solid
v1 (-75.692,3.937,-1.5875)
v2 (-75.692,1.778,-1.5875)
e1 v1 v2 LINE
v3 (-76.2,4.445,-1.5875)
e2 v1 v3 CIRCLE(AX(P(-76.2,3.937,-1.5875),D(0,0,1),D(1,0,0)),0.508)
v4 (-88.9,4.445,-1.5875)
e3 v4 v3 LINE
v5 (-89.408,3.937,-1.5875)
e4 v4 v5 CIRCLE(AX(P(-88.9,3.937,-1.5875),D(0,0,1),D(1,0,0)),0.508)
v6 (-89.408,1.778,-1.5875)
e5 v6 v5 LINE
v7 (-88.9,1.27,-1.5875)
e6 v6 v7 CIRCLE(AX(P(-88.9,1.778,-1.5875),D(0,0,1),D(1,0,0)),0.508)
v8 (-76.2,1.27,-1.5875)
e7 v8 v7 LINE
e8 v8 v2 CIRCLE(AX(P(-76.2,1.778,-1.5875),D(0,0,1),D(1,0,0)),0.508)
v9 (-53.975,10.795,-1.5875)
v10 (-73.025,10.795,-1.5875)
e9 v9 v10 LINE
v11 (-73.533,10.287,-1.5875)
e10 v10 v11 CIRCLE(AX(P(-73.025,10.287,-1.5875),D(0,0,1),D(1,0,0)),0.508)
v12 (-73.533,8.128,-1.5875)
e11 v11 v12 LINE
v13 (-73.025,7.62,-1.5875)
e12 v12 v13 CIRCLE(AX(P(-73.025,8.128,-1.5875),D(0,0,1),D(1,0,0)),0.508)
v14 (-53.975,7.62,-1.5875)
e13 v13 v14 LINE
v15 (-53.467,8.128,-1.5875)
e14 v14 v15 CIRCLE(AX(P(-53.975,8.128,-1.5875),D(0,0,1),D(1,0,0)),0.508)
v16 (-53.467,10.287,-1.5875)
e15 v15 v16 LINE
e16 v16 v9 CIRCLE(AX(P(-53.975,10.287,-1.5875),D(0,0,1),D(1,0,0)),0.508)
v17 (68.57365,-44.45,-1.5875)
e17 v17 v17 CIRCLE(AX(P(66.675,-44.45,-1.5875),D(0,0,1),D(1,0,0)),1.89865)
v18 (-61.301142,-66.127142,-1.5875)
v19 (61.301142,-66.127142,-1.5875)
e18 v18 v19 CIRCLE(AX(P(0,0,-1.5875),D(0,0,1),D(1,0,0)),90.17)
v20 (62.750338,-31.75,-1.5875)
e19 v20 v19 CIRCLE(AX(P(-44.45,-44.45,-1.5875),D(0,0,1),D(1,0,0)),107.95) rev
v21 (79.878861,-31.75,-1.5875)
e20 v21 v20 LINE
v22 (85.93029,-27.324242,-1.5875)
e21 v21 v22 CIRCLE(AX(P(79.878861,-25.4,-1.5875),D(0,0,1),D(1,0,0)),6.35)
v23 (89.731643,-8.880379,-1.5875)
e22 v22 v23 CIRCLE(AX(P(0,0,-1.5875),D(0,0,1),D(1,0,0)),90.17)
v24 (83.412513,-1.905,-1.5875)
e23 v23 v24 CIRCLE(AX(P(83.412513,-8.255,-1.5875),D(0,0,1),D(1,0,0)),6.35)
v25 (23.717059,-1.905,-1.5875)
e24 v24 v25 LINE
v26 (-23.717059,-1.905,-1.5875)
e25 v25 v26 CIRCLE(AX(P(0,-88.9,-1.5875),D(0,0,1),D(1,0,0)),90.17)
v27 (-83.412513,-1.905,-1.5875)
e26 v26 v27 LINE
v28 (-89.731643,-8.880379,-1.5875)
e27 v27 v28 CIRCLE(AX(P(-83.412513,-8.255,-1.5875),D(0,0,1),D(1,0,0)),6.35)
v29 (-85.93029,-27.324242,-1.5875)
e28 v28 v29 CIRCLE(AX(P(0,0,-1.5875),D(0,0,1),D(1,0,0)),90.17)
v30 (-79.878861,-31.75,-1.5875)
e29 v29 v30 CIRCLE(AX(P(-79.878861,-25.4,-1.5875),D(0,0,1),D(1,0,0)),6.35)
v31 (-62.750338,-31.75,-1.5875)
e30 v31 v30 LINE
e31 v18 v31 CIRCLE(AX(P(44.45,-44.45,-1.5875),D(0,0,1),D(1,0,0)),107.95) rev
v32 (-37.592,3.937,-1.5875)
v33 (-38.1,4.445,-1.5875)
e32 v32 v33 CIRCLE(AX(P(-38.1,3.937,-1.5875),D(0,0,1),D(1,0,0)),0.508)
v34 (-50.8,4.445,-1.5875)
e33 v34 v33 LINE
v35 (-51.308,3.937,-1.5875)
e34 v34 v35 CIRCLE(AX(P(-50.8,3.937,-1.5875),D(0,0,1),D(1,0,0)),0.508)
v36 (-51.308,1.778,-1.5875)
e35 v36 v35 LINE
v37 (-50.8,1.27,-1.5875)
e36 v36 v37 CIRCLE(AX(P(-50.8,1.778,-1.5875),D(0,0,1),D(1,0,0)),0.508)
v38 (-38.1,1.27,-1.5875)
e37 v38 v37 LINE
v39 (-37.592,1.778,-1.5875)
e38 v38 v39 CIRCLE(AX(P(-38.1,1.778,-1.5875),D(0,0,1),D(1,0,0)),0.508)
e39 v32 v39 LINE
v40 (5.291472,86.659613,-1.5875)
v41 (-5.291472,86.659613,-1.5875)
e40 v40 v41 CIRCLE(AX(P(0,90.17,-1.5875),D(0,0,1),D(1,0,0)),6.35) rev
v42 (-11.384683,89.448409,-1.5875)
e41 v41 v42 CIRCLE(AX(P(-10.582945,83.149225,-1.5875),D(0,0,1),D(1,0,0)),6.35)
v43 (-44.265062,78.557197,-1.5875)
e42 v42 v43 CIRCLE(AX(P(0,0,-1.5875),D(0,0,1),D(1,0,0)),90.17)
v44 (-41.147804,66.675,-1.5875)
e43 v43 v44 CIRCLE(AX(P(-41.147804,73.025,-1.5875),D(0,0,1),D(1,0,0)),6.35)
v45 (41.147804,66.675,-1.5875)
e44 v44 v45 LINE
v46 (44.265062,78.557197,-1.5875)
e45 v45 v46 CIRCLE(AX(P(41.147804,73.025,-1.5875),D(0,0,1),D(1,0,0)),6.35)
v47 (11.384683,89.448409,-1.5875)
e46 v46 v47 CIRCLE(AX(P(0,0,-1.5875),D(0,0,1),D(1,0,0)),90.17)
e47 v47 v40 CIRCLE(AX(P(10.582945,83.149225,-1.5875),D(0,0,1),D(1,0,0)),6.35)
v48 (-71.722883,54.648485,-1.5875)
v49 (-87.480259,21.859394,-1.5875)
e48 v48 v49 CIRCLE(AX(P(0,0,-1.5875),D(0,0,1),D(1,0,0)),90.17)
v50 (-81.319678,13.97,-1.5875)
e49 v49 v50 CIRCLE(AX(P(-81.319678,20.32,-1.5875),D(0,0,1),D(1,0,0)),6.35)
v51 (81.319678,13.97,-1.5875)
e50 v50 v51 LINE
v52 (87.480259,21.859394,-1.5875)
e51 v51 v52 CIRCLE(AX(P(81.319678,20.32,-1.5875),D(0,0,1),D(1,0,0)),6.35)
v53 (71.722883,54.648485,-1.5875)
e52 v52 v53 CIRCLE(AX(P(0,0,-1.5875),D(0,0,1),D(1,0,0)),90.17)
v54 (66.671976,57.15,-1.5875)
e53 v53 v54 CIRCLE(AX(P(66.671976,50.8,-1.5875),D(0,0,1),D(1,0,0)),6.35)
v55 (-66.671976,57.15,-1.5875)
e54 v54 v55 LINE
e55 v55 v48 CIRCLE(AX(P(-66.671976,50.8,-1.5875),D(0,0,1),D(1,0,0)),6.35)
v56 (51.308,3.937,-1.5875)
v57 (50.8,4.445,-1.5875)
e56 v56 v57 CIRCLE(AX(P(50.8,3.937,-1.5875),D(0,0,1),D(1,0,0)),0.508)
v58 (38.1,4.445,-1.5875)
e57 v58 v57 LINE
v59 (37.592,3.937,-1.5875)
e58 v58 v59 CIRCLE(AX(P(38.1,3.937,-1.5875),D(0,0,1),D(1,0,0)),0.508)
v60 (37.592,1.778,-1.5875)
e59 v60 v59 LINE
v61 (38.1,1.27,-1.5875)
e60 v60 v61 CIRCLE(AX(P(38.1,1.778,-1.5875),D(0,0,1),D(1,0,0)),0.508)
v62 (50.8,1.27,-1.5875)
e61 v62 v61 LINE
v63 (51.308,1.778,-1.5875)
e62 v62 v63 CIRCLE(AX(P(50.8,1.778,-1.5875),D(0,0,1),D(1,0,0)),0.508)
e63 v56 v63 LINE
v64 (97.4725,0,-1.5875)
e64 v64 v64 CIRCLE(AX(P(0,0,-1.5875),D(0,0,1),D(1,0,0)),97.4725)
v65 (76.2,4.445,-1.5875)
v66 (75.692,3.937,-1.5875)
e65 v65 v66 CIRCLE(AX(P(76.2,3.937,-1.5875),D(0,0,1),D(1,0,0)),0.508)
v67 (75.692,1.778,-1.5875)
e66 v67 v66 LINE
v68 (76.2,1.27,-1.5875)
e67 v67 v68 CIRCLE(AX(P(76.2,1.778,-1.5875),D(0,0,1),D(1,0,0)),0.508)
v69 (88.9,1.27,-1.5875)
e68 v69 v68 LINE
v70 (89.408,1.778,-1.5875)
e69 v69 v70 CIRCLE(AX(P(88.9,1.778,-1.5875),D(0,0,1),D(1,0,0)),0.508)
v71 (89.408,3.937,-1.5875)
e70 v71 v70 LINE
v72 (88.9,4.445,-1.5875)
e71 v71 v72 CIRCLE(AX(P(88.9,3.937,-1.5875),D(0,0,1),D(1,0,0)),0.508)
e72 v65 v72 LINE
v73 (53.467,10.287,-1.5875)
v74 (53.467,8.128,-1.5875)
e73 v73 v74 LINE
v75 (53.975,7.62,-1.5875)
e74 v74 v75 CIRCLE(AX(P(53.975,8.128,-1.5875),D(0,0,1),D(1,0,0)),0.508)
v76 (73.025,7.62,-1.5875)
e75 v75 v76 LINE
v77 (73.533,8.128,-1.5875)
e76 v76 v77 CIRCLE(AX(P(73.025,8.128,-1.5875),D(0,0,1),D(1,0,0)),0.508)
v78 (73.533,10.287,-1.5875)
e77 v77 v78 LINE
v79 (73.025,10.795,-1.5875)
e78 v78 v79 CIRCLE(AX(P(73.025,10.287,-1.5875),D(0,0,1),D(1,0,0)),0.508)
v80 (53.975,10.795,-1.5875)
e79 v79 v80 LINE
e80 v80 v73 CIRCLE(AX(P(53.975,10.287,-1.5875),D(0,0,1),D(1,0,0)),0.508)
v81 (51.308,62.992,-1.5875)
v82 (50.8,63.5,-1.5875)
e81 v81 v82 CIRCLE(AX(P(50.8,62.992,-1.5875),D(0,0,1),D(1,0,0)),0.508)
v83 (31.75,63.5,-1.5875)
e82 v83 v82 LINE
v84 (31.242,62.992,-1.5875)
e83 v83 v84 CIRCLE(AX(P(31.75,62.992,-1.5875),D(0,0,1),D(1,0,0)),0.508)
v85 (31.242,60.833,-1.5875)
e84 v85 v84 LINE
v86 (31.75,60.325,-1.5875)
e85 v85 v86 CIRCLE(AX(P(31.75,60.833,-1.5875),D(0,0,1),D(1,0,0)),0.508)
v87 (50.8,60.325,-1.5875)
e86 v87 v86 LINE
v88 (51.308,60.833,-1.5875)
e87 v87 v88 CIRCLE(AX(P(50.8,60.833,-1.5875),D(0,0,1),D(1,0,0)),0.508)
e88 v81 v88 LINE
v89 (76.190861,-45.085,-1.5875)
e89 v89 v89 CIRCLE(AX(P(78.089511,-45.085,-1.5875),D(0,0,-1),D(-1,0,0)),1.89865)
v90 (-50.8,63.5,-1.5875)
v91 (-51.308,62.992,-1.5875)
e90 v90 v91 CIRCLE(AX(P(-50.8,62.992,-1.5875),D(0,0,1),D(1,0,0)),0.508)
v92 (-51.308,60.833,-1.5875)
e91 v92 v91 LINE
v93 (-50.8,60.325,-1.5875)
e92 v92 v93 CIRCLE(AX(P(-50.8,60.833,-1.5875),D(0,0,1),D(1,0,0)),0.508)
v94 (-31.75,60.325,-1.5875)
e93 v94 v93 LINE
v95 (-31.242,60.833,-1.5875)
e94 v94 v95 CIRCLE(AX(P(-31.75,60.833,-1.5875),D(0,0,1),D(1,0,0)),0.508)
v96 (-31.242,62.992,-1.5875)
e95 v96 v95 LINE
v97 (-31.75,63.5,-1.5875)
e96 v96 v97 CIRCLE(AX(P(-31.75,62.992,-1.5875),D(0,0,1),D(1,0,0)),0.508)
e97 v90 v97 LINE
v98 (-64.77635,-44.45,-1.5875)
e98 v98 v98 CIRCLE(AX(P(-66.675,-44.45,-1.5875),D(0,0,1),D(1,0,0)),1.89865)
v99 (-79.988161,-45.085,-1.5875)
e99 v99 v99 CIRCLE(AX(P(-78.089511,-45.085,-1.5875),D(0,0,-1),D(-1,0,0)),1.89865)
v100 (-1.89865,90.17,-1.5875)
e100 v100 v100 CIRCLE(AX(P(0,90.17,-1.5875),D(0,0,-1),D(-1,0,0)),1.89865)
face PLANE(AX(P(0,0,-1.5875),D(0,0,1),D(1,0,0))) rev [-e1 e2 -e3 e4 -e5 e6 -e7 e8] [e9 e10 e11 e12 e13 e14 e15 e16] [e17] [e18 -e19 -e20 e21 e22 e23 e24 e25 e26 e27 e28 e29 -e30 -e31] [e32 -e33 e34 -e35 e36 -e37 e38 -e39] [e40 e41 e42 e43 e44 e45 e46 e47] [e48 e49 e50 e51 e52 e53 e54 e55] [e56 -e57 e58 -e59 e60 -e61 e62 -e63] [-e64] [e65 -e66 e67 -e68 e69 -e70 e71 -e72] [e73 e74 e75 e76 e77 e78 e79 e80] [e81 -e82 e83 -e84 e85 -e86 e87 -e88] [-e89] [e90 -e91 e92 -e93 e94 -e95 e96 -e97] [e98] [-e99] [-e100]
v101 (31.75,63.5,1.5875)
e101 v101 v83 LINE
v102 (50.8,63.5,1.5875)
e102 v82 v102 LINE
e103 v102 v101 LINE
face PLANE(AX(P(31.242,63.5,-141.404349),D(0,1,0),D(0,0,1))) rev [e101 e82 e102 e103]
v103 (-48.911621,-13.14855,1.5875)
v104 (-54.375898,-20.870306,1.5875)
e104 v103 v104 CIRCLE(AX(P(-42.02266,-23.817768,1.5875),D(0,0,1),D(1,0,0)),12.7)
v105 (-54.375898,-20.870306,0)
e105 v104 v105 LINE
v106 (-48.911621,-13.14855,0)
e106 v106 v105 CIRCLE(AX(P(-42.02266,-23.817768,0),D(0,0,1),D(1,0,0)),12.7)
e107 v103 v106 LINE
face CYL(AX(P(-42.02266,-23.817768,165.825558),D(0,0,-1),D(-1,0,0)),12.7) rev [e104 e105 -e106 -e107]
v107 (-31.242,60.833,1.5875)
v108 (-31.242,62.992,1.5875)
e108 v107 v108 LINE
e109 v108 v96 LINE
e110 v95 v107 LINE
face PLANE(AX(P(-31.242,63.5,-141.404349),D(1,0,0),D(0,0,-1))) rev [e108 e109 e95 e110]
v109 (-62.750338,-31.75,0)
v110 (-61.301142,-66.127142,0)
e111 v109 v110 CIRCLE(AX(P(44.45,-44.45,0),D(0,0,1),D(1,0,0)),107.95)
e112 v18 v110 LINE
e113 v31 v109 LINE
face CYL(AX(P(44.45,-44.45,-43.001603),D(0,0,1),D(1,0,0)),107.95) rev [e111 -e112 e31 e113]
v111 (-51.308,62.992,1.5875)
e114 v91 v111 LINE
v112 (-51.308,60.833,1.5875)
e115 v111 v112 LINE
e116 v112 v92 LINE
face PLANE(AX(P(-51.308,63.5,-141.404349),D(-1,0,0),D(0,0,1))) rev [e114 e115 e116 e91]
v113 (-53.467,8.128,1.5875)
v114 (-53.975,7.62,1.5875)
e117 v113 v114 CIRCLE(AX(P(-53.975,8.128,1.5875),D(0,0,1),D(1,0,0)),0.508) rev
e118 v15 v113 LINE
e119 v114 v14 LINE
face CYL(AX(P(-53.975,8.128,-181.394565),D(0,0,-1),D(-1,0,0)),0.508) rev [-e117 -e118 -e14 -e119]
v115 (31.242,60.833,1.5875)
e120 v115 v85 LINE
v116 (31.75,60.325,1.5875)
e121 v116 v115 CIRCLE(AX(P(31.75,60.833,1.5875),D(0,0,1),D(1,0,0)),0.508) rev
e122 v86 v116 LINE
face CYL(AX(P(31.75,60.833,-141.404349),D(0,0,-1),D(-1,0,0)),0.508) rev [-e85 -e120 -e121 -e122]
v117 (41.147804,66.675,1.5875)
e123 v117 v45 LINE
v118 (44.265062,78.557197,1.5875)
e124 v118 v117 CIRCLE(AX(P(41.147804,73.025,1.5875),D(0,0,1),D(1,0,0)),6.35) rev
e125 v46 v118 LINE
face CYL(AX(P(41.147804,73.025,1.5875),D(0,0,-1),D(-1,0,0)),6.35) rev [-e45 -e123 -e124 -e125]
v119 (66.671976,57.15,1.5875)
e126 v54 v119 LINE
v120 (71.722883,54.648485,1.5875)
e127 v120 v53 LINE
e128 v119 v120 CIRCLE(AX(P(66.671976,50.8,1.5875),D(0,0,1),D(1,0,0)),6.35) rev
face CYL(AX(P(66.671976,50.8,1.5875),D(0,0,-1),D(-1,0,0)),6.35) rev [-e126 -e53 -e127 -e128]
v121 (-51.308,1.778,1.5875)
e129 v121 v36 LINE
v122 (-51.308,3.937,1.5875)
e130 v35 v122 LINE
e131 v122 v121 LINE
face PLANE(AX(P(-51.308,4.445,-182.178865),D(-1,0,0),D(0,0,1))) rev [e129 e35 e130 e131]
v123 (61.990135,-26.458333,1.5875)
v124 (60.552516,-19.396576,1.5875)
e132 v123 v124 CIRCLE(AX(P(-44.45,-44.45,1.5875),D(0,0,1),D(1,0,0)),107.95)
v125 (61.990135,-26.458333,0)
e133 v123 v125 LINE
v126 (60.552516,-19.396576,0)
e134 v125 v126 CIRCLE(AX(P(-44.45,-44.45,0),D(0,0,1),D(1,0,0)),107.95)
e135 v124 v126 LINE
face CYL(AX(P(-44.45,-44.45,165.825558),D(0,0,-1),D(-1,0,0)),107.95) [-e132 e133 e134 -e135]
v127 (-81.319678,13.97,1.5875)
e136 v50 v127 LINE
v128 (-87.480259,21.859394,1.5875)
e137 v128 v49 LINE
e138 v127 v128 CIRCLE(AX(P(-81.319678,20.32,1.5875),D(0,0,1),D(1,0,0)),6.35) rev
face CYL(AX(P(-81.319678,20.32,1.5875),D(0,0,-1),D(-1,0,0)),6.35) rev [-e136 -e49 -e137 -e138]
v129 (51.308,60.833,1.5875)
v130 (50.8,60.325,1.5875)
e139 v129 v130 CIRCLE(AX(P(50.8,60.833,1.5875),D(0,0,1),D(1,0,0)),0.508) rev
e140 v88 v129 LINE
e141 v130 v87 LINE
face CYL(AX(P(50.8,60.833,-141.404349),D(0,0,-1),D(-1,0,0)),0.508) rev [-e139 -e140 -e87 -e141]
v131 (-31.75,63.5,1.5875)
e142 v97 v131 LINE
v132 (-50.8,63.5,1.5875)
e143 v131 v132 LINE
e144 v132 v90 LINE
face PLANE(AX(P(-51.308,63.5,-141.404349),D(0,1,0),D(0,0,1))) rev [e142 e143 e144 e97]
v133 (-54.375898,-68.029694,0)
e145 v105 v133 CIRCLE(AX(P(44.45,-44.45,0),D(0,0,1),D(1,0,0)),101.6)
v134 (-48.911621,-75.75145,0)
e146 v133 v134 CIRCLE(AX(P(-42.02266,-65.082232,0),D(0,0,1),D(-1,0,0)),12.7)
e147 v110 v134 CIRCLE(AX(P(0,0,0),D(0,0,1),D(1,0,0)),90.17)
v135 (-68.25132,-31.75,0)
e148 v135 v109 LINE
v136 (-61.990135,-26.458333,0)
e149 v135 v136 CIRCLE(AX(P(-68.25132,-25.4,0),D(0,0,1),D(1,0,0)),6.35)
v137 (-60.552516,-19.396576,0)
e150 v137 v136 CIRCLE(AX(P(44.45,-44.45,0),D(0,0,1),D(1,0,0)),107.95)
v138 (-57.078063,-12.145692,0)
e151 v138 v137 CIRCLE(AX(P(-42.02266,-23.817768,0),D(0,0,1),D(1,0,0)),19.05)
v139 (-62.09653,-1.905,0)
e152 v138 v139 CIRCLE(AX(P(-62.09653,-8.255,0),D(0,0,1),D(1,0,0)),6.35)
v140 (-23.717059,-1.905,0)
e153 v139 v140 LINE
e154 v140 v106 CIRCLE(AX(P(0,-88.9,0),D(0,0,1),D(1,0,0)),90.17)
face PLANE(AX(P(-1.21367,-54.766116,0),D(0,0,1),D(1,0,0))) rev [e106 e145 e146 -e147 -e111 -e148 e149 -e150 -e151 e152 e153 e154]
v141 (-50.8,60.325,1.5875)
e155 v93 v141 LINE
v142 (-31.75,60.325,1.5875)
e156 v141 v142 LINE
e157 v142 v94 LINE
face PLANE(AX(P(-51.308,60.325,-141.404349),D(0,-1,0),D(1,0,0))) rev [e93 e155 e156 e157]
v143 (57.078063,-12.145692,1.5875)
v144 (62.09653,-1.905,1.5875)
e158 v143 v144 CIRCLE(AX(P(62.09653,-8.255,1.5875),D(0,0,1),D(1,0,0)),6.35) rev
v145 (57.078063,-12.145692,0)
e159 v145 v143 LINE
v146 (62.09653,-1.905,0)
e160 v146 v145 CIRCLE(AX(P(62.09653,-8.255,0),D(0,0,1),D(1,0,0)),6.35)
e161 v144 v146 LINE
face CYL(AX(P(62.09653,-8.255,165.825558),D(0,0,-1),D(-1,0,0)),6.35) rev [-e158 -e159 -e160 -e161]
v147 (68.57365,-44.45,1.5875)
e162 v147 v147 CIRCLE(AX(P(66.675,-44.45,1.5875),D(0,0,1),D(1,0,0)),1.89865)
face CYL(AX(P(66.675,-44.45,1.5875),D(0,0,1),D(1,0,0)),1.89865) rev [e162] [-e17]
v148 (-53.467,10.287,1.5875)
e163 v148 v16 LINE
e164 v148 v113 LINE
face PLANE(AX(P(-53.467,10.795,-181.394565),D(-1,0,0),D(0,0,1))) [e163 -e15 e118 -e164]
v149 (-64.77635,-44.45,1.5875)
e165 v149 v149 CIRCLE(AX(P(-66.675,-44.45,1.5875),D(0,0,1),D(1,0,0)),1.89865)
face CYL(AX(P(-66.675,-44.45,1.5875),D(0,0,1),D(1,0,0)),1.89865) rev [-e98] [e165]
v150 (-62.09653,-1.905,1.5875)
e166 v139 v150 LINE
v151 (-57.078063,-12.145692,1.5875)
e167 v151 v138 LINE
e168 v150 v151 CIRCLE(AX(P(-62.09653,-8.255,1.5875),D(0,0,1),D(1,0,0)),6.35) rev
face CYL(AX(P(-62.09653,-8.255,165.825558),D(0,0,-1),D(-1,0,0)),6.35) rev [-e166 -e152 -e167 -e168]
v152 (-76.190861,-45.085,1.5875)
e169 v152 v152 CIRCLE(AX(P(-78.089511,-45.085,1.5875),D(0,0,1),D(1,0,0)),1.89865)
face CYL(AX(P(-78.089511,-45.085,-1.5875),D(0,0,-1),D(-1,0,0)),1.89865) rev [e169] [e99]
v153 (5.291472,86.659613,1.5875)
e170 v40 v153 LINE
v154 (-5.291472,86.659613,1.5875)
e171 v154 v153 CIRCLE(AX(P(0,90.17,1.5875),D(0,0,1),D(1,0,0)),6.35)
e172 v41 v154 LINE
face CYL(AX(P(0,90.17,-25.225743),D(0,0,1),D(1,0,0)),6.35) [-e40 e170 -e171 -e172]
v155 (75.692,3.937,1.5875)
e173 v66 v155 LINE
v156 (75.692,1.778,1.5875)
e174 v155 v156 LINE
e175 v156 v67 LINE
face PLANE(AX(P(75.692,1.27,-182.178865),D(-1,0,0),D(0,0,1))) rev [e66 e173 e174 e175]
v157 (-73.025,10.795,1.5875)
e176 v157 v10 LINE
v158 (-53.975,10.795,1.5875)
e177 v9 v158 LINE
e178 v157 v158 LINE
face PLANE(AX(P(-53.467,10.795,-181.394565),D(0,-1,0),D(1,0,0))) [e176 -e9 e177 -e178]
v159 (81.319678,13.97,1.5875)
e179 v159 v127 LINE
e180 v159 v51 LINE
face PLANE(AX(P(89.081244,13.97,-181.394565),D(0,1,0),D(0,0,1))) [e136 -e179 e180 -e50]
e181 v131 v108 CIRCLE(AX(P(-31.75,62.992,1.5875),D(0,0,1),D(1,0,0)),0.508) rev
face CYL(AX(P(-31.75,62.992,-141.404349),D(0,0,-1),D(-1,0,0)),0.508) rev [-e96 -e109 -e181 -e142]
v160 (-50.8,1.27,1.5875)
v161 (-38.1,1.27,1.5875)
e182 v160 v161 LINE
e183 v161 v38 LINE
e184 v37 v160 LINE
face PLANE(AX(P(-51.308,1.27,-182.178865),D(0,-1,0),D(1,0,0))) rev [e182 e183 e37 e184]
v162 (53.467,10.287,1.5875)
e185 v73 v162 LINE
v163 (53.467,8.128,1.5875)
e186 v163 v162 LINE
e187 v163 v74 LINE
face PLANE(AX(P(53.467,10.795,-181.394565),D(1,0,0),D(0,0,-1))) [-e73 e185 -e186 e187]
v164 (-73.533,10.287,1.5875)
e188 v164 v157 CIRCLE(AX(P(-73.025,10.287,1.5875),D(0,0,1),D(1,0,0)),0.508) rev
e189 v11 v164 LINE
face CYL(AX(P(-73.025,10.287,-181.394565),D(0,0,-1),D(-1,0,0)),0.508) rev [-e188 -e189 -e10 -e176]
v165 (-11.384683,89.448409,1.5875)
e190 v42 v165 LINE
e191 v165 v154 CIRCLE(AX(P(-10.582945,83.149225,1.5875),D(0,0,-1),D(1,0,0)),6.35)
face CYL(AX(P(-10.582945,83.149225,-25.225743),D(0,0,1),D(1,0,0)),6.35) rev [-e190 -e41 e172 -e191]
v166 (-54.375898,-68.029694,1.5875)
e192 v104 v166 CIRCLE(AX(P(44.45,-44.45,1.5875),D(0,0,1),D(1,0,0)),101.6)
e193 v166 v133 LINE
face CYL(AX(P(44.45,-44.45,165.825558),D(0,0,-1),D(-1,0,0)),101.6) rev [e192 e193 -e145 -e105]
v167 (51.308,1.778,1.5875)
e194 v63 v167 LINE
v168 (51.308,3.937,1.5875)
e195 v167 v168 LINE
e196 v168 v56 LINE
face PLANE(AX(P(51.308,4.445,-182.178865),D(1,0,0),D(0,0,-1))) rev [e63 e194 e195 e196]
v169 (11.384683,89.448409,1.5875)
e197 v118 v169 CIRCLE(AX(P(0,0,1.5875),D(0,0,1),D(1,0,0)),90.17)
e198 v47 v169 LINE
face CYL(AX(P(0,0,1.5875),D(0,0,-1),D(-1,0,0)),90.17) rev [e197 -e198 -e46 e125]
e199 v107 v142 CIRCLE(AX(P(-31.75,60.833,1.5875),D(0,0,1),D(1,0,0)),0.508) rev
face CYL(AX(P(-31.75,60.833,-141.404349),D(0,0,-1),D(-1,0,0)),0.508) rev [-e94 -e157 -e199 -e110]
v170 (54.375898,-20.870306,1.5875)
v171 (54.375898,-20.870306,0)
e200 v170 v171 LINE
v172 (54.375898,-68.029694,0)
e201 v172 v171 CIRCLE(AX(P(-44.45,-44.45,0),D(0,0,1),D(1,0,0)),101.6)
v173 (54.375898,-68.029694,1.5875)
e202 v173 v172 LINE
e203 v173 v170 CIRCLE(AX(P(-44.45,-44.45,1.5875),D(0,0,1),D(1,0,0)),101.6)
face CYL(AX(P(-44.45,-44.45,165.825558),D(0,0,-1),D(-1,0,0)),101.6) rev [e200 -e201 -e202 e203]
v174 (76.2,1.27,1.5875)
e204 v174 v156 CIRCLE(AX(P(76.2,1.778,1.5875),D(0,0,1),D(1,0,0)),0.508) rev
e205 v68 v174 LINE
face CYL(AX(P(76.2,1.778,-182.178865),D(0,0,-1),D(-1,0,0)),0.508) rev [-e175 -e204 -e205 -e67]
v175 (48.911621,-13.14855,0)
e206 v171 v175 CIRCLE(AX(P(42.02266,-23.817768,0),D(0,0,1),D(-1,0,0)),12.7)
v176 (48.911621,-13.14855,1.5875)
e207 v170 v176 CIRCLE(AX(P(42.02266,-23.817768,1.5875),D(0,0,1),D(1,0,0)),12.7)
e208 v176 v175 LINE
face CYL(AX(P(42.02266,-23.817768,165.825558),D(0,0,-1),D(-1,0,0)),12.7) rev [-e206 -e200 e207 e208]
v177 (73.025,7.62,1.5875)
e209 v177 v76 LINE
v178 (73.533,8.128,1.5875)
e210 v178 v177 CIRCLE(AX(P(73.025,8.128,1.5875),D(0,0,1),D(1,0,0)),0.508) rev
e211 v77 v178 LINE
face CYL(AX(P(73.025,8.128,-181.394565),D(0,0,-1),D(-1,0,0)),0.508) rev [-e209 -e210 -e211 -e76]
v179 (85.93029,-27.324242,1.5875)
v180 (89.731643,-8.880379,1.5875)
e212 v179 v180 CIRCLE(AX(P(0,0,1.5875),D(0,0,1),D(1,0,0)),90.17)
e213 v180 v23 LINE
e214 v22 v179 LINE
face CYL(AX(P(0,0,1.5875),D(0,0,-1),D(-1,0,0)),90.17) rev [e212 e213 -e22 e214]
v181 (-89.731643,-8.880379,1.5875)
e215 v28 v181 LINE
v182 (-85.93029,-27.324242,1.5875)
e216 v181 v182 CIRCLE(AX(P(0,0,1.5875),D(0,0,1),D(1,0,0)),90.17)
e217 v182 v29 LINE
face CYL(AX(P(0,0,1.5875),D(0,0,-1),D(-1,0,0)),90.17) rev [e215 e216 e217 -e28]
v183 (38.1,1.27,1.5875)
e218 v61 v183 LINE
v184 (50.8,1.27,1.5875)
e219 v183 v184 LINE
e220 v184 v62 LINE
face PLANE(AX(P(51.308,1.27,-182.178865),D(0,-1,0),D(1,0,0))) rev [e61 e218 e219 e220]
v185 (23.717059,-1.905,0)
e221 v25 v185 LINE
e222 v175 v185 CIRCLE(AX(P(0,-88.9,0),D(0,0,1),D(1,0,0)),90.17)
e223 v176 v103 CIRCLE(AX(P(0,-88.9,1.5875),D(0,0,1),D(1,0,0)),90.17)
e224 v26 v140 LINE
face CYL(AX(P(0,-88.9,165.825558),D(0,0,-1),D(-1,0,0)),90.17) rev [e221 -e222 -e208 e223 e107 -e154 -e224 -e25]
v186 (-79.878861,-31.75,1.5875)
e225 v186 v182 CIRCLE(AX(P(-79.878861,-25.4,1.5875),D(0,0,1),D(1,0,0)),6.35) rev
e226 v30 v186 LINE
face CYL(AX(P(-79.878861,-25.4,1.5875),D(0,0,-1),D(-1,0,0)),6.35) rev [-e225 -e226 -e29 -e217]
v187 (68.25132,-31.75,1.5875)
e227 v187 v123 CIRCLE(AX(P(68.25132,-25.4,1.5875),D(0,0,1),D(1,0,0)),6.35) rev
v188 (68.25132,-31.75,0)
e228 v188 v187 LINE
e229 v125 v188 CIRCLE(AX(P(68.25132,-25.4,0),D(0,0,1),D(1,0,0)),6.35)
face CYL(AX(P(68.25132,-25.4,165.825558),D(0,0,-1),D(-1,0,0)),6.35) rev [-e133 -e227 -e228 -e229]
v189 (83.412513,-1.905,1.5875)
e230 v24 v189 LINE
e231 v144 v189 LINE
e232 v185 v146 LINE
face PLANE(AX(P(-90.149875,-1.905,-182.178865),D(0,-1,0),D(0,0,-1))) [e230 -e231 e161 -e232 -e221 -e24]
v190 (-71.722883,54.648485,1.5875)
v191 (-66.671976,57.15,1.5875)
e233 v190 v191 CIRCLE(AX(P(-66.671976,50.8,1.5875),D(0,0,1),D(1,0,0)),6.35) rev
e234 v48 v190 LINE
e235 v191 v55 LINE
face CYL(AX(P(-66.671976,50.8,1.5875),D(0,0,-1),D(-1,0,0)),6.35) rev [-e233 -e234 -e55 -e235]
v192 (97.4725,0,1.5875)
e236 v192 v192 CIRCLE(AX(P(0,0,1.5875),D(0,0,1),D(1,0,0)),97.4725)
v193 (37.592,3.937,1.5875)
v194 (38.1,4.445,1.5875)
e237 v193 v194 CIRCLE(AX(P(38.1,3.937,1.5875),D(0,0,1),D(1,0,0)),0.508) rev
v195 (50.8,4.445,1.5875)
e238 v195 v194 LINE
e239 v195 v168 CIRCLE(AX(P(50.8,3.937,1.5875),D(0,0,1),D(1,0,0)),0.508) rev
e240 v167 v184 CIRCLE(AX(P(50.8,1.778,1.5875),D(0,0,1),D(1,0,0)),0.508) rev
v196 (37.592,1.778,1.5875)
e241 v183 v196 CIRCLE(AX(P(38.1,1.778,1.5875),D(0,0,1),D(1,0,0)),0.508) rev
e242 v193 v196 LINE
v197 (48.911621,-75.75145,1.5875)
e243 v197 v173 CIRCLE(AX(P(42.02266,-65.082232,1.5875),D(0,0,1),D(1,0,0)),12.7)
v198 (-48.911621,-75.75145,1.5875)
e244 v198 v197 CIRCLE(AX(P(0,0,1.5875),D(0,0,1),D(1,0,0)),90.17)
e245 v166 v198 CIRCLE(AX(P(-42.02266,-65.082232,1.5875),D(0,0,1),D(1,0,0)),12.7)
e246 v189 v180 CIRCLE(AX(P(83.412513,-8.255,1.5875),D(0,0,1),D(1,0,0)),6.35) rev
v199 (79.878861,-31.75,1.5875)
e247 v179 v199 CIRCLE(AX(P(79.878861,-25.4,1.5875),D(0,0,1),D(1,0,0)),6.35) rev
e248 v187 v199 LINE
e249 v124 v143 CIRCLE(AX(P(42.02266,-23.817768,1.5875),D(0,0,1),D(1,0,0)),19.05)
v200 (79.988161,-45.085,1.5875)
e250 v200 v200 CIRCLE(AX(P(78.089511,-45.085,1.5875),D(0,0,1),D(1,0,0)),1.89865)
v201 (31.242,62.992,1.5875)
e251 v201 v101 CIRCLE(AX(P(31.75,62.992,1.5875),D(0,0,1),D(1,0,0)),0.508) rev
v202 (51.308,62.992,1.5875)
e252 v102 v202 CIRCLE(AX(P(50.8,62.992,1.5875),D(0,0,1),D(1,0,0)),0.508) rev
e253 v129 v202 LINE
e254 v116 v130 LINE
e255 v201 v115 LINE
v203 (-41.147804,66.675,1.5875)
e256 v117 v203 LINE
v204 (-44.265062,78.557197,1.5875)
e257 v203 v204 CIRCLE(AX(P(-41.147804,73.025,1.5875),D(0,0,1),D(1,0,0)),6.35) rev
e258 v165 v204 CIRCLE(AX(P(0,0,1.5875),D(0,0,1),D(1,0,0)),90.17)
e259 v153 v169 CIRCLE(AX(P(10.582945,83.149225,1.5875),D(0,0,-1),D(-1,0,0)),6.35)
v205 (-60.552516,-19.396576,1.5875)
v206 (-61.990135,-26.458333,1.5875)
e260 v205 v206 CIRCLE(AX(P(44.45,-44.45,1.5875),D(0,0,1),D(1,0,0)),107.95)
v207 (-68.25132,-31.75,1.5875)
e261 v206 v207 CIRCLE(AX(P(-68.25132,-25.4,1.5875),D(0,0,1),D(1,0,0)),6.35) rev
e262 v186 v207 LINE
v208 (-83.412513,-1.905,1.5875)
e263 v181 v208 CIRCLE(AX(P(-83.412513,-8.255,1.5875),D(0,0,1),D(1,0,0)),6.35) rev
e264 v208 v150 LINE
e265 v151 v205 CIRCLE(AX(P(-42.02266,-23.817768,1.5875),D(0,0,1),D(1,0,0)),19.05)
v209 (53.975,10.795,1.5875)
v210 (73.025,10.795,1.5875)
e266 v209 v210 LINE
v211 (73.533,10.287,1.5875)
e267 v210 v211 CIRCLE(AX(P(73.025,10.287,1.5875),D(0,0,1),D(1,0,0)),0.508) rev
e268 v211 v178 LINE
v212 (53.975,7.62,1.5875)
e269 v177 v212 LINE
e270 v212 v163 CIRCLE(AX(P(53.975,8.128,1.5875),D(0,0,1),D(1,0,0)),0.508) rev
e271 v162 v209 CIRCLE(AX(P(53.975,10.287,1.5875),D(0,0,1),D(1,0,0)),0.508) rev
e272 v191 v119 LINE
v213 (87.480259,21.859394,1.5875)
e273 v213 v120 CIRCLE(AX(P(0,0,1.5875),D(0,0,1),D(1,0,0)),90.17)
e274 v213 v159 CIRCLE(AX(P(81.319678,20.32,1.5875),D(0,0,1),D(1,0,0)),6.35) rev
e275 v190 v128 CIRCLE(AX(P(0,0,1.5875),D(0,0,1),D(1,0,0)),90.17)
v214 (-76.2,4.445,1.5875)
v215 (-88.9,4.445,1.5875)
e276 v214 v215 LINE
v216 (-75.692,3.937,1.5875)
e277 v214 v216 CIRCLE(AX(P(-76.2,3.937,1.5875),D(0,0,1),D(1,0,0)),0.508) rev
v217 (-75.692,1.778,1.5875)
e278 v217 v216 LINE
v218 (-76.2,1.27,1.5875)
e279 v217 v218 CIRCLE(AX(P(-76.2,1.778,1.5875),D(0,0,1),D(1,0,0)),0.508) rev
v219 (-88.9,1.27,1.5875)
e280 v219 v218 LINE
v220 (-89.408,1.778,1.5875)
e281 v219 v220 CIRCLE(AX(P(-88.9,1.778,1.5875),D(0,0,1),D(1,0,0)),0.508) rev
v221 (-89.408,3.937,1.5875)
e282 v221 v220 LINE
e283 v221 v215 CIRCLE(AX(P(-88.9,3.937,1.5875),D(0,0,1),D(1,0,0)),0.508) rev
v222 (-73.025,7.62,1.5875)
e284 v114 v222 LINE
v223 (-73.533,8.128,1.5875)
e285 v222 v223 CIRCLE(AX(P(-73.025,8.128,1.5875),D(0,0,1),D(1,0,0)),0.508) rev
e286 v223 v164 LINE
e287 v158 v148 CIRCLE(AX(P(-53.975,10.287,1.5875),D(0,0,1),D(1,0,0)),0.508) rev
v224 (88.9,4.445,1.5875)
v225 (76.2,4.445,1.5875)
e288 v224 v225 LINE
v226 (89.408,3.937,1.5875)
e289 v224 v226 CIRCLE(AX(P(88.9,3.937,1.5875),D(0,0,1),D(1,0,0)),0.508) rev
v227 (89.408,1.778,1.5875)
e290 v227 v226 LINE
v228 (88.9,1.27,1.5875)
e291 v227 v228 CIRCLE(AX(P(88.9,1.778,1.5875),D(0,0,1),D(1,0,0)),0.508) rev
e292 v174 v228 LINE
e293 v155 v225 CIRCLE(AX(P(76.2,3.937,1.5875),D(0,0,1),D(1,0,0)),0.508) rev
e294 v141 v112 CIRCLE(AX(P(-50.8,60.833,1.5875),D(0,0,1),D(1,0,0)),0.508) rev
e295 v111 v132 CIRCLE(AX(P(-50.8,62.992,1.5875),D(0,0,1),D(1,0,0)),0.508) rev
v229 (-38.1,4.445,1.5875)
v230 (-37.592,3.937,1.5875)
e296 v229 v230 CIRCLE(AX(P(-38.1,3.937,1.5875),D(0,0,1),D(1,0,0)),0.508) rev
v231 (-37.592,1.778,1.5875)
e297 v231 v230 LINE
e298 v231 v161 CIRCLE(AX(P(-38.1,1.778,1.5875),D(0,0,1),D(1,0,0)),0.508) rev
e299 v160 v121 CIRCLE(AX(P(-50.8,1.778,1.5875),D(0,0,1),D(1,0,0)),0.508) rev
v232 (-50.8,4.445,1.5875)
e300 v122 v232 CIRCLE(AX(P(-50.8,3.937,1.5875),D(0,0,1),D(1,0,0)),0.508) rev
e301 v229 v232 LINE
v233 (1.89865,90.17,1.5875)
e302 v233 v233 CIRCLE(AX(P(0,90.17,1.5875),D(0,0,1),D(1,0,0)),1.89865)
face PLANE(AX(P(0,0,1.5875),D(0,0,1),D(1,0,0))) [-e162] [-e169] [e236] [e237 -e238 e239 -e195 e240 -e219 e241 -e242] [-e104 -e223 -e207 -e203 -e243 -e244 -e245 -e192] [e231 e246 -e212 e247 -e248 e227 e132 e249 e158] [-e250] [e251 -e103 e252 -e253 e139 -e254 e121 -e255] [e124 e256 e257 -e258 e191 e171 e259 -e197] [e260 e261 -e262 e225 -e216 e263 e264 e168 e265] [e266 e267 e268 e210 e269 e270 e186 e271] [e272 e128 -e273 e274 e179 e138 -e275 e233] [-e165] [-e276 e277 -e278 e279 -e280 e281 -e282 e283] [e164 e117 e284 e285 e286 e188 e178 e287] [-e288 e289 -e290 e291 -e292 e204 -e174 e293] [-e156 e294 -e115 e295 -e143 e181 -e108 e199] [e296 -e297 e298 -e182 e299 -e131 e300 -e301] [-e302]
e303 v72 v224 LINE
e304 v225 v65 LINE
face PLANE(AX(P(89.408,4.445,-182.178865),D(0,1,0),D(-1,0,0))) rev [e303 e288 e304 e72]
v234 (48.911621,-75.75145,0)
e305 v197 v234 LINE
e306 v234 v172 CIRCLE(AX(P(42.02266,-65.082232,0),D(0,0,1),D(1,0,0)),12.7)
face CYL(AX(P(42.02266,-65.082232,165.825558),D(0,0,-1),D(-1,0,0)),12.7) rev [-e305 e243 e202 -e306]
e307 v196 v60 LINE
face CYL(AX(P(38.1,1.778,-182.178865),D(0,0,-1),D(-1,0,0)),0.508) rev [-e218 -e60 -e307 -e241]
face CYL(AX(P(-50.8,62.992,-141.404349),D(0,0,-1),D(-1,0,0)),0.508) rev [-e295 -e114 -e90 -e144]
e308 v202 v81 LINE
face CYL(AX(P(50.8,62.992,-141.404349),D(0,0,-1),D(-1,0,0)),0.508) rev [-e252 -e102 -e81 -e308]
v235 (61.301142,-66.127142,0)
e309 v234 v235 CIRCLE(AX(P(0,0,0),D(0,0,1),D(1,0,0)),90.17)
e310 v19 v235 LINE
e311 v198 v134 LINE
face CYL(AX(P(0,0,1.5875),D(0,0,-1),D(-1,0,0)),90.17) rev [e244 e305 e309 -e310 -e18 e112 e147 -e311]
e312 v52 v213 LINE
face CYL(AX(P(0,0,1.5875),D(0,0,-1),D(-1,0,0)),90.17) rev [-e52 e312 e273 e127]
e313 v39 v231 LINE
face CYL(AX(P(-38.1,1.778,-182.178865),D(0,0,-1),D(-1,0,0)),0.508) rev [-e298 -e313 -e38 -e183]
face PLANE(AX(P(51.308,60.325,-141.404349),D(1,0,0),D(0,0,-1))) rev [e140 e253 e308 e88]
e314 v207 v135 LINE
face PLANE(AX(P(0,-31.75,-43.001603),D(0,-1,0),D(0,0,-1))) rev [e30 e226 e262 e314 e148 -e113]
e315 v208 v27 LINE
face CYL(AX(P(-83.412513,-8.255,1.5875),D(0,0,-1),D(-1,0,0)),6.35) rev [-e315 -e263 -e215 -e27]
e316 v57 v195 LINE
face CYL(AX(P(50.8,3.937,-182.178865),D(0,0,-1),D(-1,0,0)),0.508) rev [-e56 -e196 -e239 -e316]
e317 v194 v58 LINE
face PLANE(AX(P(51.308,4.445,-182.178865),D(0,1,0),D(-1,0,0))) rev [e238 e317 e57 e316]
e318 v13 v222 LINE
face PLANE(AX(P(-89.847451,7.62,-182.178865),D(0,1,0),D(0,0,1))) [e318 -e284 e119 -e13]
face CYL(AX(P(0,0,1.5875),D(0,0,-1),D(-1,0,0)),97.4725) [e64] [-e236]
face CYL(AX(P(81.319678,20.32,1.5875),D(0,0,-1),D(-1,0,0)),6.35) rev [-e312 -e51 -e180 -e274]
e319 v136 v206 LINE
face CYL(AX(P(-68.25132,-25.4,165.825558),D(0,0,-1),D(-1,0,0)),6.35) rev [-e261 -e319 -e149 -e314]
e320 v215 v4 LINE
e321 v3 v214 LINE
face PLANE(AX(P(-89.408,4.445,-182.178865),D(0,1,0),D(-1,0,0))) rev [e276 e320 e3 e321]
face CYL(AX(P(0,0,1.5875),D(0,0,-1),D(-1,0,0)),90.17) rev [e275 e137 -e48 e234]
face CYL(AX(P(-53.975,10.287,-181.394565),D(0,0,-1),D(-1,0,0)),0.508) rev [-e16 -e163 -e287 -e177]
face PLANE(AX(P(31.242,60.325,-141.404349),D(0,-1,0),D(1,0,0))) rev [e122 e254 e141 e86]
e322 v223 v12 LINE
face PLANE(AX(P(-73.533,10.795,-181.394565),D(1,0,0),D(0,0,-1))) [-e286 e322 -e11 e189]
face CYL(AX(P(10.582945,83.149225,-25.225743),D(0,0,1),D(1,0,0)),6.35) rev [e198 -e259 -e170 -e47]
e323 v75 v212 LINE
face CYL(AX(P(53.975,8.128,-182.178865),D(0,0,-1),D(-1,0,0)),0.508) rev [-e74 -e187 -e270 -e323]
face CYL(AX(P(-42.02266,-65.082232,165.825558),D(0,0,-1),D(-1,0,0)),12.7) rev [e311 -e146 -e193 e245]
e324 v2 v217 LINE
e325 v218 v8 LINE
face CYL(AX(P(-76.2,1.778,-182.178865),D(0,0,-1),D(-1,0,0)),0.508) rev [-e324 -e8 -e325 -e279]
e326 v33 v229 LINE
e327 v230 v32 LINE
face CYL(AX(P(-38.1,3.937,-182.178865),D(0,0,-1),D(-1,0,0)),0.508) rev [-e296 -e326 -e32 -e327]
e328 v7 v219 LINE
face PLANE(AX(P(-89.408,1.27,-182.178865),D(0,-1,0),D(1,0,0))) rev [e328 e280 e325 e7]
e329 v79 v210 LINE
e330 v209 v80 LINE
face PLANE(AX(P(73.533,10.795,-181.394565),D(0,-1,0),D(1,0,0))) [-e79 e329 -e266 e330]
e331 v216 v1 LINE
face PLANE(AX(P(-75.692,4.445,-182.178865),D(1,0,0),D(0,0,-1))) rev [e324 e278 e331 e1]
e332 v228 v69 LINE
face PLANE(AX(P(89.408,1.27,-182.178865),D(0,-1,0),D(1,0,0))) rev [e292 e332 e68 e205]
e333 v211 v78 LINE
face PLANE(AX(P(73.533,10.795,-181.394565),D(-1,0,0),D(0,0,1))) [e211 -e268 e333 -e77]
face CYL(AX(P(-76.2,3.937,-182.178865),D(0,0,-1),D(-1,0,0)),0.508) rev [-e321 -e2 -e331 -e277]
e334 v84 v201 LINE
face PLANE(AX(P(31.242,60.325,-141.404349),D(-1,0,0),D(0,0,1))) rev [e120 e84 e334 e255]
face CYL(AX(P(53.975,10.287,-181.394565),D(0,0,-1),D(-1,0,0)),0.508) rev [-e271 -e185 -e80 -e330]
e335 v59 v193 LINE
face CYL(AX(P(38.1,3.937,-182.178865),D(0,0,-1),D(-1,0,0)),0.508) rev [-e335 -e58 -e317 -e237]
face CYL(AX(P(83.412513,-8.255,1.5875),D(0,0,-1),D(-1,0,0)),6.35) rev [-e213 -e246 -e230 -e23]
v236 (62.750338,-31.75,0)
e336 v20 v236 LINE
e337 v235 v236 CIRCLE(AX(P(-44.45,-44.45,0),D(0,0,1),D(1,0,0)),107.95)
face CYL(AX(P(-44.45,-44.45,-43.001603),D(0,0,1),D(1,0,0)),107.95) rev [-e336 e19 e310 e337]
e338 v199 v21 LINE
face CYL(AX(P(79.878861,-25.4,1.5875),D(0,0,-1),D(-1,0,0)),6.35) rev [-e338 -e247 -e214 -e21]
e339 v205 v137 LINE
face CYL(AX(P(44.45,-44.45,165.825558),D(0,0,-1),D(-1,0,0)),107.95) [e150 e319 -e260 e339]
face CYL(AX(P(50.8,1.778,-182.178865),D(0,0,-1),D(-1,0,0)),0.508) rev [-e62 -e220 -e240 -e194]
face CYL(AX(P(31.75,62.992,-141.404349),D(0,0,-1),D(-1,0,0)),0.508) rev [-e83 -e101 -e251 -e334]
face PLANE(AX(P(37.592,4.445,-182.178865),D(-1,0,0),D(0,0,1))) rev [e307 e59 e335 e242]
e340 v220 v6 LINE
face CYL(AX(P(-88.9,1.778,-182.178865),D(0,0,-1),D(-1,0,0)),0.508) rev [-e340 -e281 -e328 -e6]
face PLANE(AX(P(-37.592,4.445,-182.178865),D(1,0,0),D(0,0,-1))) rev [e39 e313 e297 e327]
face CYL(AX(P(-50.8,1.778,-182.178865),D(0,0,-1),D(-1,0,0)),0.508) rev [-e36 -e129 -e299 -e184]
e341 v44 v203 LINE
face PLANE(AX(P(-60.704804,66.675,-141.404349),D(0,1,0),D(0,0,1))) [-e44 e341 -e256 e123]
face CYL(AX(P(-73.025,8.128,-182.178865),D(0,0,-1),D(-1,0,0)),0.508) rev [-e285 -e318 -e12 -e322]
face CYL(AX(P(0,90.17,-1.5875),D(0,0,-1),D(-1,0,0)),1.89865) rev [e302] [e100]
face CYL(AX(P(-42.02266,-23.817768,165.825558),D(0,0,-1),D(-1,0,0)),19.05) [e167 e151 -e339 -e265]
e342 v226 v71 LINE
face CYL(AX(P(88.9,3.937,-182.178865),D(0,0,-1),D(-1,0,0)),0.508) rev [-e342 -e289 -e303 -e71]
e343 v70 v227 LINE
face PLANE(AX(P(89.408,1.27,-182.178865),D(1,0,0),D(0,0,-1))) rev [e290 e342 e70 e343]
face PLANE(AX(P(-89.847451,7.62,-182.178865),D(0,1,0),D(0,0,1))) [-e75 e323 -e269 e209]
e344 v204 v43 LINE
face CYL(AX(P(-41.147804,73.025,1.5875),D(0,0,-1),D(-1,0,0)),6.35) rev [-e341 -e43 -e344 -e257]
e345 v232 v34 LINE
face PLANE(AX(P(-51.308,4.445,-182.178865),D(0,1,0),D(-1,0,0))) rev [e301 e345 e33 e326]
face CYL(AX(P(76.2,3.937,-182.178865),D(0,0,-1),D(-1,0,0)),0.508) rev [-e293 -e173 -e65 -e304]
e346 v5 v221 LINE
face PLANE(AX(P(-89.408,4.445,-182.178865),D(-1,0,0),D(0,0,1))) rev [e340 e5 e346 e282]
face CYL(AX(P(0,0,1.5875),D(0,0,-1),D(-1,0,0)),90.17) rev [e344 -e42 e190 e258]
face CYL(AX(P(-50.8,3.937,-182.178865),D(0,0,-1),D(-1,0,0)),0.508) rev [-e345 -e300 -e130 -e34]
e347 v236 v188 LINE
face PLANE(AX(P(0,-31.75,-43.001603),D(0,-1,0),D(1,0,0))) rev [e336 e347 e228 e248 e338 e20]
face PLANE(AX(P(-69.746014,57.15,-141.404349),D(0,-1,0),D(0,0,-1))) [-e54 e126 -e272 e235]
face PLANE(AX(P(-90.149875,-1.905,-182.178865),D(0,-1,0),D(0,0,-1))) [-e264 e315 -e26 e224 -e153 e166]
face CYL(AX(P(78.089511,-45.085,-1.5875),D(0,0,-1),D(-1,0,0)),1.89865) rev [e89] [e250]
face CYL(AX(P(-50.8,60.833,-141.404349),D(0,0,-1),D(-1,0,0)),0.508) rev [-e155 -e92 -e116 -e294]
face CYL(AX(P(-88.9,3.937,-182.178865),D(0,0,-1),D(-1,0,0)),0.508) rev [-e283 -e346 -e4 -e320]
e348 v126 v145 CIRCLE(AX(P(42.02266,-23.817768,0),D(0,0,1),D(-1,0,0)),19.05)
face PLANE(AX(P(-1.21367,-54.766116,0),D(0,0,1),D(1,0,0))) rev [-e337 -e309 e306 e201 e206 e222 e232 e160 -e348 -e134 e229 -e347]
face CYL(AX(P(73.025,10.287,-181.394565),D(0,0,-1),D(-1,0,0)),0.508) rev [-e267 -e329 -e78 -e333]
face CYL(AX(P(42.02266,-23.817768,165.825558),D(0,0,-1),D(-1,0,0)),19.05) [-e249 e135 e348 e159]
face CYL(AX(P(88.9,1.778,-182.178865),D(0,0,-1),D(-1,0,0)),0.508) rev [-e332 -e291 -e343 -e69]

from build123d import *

# Parameters (mm, degrees)
SKETCH1_R             = 97.4725
SKETCH1_R_2           = 90.17
BOSS_EXTRUDE1_DEPTH   = 1.5875
BOSS_EXTRUDE2_START   = -3.175
BOSS_EXTRUDE2_DEPTH   = 3.175
CIRPATTERN2_COUNT     = 3
BOSS_EXTRUDE3_DEPTH   = 1.5875
BOSS_EXTRUDE4_START   = -3.175
BOSS_EXTRUDE4_DEPTH   = 3.175
FILLET2_R             = 6.35
F_6_CLEARANCE_HOLE1_D = 3.7973
BOSS_EXTRUDE5_START   = -3.175
SKETCH13_W            = 13.716
SKETCH13_H            = 3.175
BOSS_EXTRUDE5_DEPTH   = 3.175
SKETCH14_W            = 13.716
SKETCH14_H            = 3.175
CUT_EXTRUDE1_DEPTH    = 138.883491171
BOSS_EXTRUDE6_START   = -3.175
BOSS_EXTRUDE6_DEPTH   = 3.175
BOSS_EXTRUDE7_START   = -3.175
SKETCH16_W            = 20.066
SKETCH16_H            = 3.175
BOSS_EXTRUDE7_DEPTH   = 3.175
FILLET3_R             = 6.35
FILLET4_R             = 0.508


with BuildPart() as part:
    # Sketch1 → Boss-Extrude1 (new, symmetric)
    with BuildSketch(Plane.XY):
        Circle(SKETCH1_R)
        Circle(SKETCH1_R_2, mode=Mode.SUBTRACT)
    extrude(amount=BOSS_EXTRUDE1_DEPTH, both=True)

    # Sketch2 → Boss-Extrude2 (add)
    with BuildSketch(Plane.XY.offset(1.5875).offset(BOSS_EXTRUDE2_START)):
        with BuildLine():
            ThreePointArc((-5.291472464, 86.659612676), (0, 83.82), (5.291472464, 86.659612676))
            ThreePointArc((5.291472464, 86.659612676), (7.940261692, 88.923194985), (11.38468318, 89.448409091))
            ThreePointArc((11.38468318, 89.448409091), (0, 90.17), (-11.38468318, 89.448409091))
            ThreePointArc((-11.38468318, 89.448409091), (-7.940261692, 88.923194985), (-5.291472464, 86.659612676))
        make_face()
    boss_extrude2 = extrude(amount=BOSS_EXTRUDE2_DEPTH)

    # Sketch7 → #6 Clearance Hole2 (revolve, cut)
    with BuildSketch(Plane(origin=(0, 90.17, -1.5875), x_dir=(0, 1, 0), z_dir=(1, 0, 0))):
        Polygon((0, 0), (0, 7.490824014), (1.89865, 6.35), (1.89865, 0), align=None)
    f_6_clearance_hole2 = revolve(axis=Axis((0, 90.17, -7.9375), (0, 0, 1)), mode=Mode.SUBTRACT)

    # CirPattern2: Boss-Extrude2, #6 Clearance Hole2 ×3 about axis
    cirpattern2_axis = Axis((0, 0, 0), (0, 0, 1))
    add([boss_extrude2.rotate(cirpattern2_axis, i * 360 / CIRPATTERN2_COUNT) for i in range(1, CIRPATTERN2_COUNT)])
    add([f_6_clearance_hole2.rotate(cirpattern2_axis, i * 360 / CIRPATTERN2_COUNT) for i in range(1, CIRPATTERN2_COUNT)], mode=Mode.SUBTRACT)

    # Sketch9 → Boss-Extrude3 (add)
    with BuildSketch(Plane.XY):
        with BuildLine():
            ThreePointArc((60.552516274, -69.503424438), (63.5, -44.45), (60.552516274, -19.396575562))
            ThreePointArc((60.552516274, -19.396575562), (57.572960629, -12.81364776), (52.356101558, -7.813940596))
            ThreePointArc((52.356101558, -7.813940596), (0, 7.62), (-52.356101558, -7.813940596))
            ThreePointArc((-52.356101558, -7.813940596), (-57.572960629, -12.81364776), (-60.552516274, -19.396575562))
            ThreePointArc((-60.552516274, -19.396575562), (-63.5, -44.45), (-60.552516274, -69.503424438))
            ThreePointArc((-60.552516274, -69.503424438), (-57.572960629, -76.08635224), (-52.356101558, -81.086059404))
            ThreePointArc((-52.356101558, -81.086059404), (0, -96.52), (52.356101558, -81.086059404))
            ThreePointArc((52.356101558, -81.086059404), (57.572960629, -76.08635224), (60.552516274, -69.503424438))
        make_face()
        with BuildLine():
            ThreePointArc((48.911621193, -13.148549768), (0, 1.27), (-48.911621193, -13.148549768))
            ThreePointArc((-48.911621193, -13.148549768), (-52.38952724, -16.481687877), (-54.37589767, -20.870306412))
            ThreePointArc((-54.37589767, -20.870306412), (-57.15, -44.45), (-54.37589767, -68.029693588))
            ThreePointArc((-54.37589767, -68.029693588), (-52.38952724, -72.418312123), (-48.911621193, -75.751450232))
            ThreePointArc((-48.911621193, -75.751450232), (0, -90.17), (48.911621193, -75.751450232))
            ThreePointArc((48.911621193, -75.751450232), (52.38952724, -72.418312123), (54.37589767, -68.029693588))
            ThreePointArc((54.37589767, -68.029693588), (57.15, -44.45), (54.37589767, -20.870306412))
            ThreePointArc((54.37589767, -20.870306412), (52.38952724, -16.481687877), (48.911621193, -13.148549768))
        make_face(mode=Mode.SUBTRACT)
    extrude(amount=BOSS_EXTRUDE3_DEPTH)

    # Sketch10 → Boss-Extrude4 (add)
    with BuildSketch(Plane.XY.offset(1.5875).offset(BOSS_EXTRUDE4_START)):
        with BuildLine():
            Line((-62.750338152, -31.75), (-84.395298447, -31.75))
            ThreePointArc((-84.395298447, -31.75), (-83.790591931, -33.31314461), (-83.156936191, -34.864779698))
            ThreePointArc((-83.156936191, -34.864779698), (-80.979876688, -37.585129154), (-77.695162292, -38.747256761))
            ThreePointArc((-77.695162292, -38.747256761), (-72.590249345, -41.91), (-72.403689828, -47.912355915))
            ThreePointArc((-72.403689828, -47.912355915), (-73.039614996, -51.33806583), (-71.772253011, -54.583629393))
            ThreePointArc((-71.772253011, -54.583629393), (-66.786565118, -60.582040406), (-61.301141923, -66.127141923))
            ThreePointArc((-61.301141923, -66.127141923), (-63.404208023, -48.996681395), (-62.750338152, -31.75))
        make_face()
        with BuildLine():
            Line((84.395298447, -31.75), (62.750338152, -31.75))
            ThreePointArc((62.750338152, -31.75), (63.404208023, -48.996681395), (61.301141923, -66.127141923))
            ThreePointArc((61.301141923, -66.127141923), (66.786565118, -60.582040406), (71.772253011, -54.583629393))
            ThreePointArc((71.772253011, -54.583629393), (73.039614996, -51.33806583), (72.403689828, -47.912355915))
            ThreePointArc((72.403689828, -47.912355915), (72.590249345, -41.91), (77.695162292, -38.747256761))
            ThreePointArc((77.695162292, -38.747256761), (80.979876688, -37.585129154), (83.156936191, -34.864779698))
            ThreePointArc((83.156936191, -34.864779698), (83.790591931, -33.31314461), (84.395298447, -31.75))
        make_face()
    extrude(amount=BOSS_EXTRUDE4_DEPTH)

    # Fillet2
    fillet2_edges = [part.edges().sort_by_distance(p)[0] for p in [
        (-62.750338152, -31.75, 0.79375),
        (-84.395298447, -31.75, 0),
        (84.395298447, -31.75, 0),
        (62.750338152, -31.75, 0.79375),
    ]]
    fillet(fillet2_edges, radius=FILLET2_R)

    # #6 Clearance Hole1 (through all)
    with Locations(Plane.XY.offset(1.5875)):
        with Locations((-66.675, -44.45), (66.675, -44.45)):
            Hole(F_6_CLEARANCE_HOLE1_D / 2)

    # Sketch13 → Boss-Extrude5 (add)
    with BuildSketch(Plane.XY.offset(1.5875).offset(BOSS_EXTRUDE5_START)):
        with BuildLine():
            Line((-90.149874515, -1.905), (90.149874515, -1.905))
            ThreePointArc((90.149874515, -1.905), (90.124584486, 2.86149807), (89.847451272, 7.62))
            Line((89.847451272, 7.62), (-89.847451272, 7.62))
            ThreePointArc((-89.847451272, 7.62), (-90.124584486, 2.86149807), (-90.149874515, -1.905))
        make_face()
        with Locations((-82.55, 2.8575)):
            Rectangle(SKETCH13_W, SKETCH13_H, mode=Mode.SUBTRACT)
        with Locations((82.55, 2.8575)):
            Rectangle(SKETCH13_W, SKETCH13_H, mode=Mode.SUBTRACT)
        with Locations((-44.45, 2.8575)):
            Rectangle(SKETCH13_W, SKETCH13_H, mode=Mode.SUBTRACT)
        with Locations((44.45, 2.8575)):
            Rectangle(SKETCH13_W, SKETCH13_H, mode=Mode.SUBTRACT)
    extrude(amount=BOSS_EXTRUDE5_DEPTH)

    # Sketch14 → Cut-Extrude1 (cut, through all)
    with BuildSketch(Plane.XY.offset(1.5875)):
        with BuildLine():
            Line((-23.717058734, -1.905), (23.717058734, -1.905))
            ThreePointArc((23.717058734, -1.905), (0, 1.27), (-23.717058734, -1.905))
        make_face()
        with Locations((-82.55, 2.8575)):
            Rectangle(SKETCH14_W, SKETCH14_H)
        with Locations((82.55, 2.8575)):
            Rectangle(SKETCH14_W, SKETCH14_H)
    extrude(amount=-CUT_EXTRUDE1_DEPTH, mode=Mode.SUBTRACT)

    # Sketch15 → Boss-Extrude6 (add)
    with BuildSketch(Plane.XY.offset(1.5875).offset(BOSS_EXTRUDE6_START)):
        with BuildLine():
            Line((89.081243817, 13.97), (-89.081243817, 13.97))
            ThreePointArc((-89.081243817, 13.97), (-89.5206686, 10.801795844), (-89.847451272, 7.62))
            Line((-89.847451272, 7.62), (-73.533, 7.62))
            Line((-73.533, 7.62), (-73.533, 10.795))
            Line((-73.533, 10.795), (-53.467, 10.795))
            Line((-53.467, 10.795), (-53.467, 7.62))
            Line((-53.467, 7.62), (53.467, 7.62))
            Line((53.467, 7.62), (53.467, 10.795))
            Line((53.467, 10.795), (73.533, 10.795))
            Line((73.533, 10.795), (73.533, 7.62))
            Line((73.533, 7.62), (89.847451272, 7.62))
            ThreePointArc((89.847451272, 7.62), (89.5206686, 10.801795844), (89.081243817, 13.97))
        make_face()
    extrude(amount=BOSS_EXTRUDE6_DEPTH)

    # Sketch16 → Boss-Extrude7 (add)
    with BuildSketch(Plane.XY.offset(1.5875).offset(BOSS_EXTRUDE7_START)):
        with BuildLine():
            Line((-60.704804382, 66.675), (60.704804382, 66.675))
            ThreePointArc((60.704804382, 66.675), (65.399047227, 62.0773189), (69.746013506, 57.15))
            Line((69.746013506, 57.15), (-69.746013506, 57.15))
            ThreePointArc((-69.746013506, 57.15), (-65.399047227, 62.0773189), (-60.704804382, 66.675))
        make_face()
        with Locations((-41.275, 61.9125)):
            Rectangle(SKETCH16_W, SKETCH16_H, mode=Mode.SUBTRACT)
        with Locations((41.275, 61.9125)):
            Rectangle(SKETCH16_W, SKETCH16_H, mode=Mode.SUBTRACT)
    extrude(amount=BOSS_EXTRUDE7_DEPTH)

    # Fillet3
    # the kernel refuses this fillet: 6.35 mm, written as the material it adds along each edge
    with BuildSketch(Plane(origin=(-90.149874515, -1.905, -1.5875), x_dir=(0.05985075276270443, -0.9982073368763315, 0), z_dir=(0, 0, 1))) as fillet3_piece_1:
        with BuildLine():
            CenterArc((6.74185273, 6.345231116), FILLET3_R, 176.568753865, 95.65192799)
            Line((0.40323614, 6.725283396), (0, 0))
            ThreePointArc((0, 0), (3.493952874, -0.067718157), (6.987905749, 0))
        make_face()
    extrude(amount=3.175)
    with BuildSketch(Plane(origin=(90.149874515, -1.905, -1.5875), x_dir=(-1, 0, 0), z_dir=(0, 0, 1))) as fillet3_piece_2:
        with BuildLine():
            CenterArc((6.737361215, 6.35), FILLET3_R, 174.34807201, 95.65192799)
            ThreePointArc((0.418231419, 6.975378788), (0.141518948, 3.491742377), (0, 0))
            Line((0, 0), (6.737361215, 0))
        make_face()
    extrude(amount=3.175)
    with BuildSketch(Plane(origin=(41.808855222, -1.905, 1.5875), x_dir=(1, 0, 0), z_dir=(0, 0, -1))) as fillet3_piece_3:
        with BuildLine():
            CenterArc((20.287675039, 6.35), FILLET3_R, 142.214475454, 127.785524546)
            Line((15.269207589, 10.240692028), (14.767360844, 10.62976123))
            ThreePointArc((14.767360844, 10.62976123), (10.202798299, 6.442401513), (-0.275058258, 0.572335526))
            Line((-0.275058258, 0.572335526), (0, -0.635))
            Line((0, -0.635), (20.287675039, -0.635))
            Line((20.287675039, -0.635), (20.287675039, 0))
        make_face()
    extrude(amount=1.5875)
    with BuildSketch(Plane(origin=(-41.808855222, -1.905, 1.5875), x_dir=(-1, 0, 0), z_dir=(0, 0, -1))) as fillet3_piece_4:
        with BuildLine():
            CenterArc((20.287675039, -6.35), FILLET3_R, 90, 127.785524546)
            Line((15.269207589, -10.240692028), (14.767360844, -10.62976123))
            ThreePointArc((14.767360844, -10.62976123), (10.202798299, -6.442401513), (-0.275058258, -0.572335526))
            Line((-0.275058258, -0.572335526), (0, 0.635))
            Line((0, 0.635), (20.287675039, 0.635))
            Line((20.287675039, 0.635), (20.287675039, 0))
        make_face()
    extrude(amount=1.5875)
    with BuildSketch(Plane(origin=(-89.081243817, 13.97, -1.5875), x_dir=(0.19887515210932474, 0.9800248332942859, 0), z_dir=(0, 0, 1))) as fillet3_piece_5:
        with BuildLine():
            CenterArc((7.766740311, -6.343670211), FILLET3_R, 87.4415233, 104.029665401)
            Line((1.543582619, -7.606527427), (0, 0))
            ThreePointArc((0, 0), (4.025098993, 0.089883004), (8.050197986, 0))
        make_face()
    extrude(amount=3.175)
    with BuildSketch(Plane(origin=(89.081243817, 13.97, -1.5875), x_dir=(-0.19887515210932458, 0.9800248332942859, 0), z_dir=(0, 0, 1))) as fillet3_piece_6:
        with BuildLine():
            CenterArc((7.766740311, 6.343670211), FILLET3_R, 168.528811299, 104.029665401)
            Line((1.543582619, 7.606527427), (0, 0))
            ThreePointArc((0, 0), (4.025098993, -0.089883004), (8.050197986, 0))
        make_face()
    extrude(amount=3.175)
    with BuildSketch(Plane(origin=(69.746013506, 57.15, -1.5875), x_dir=(0.6200286205127284, -0.7845791927811258, 0), z_dir=(0, 0, 1))) as fillet3_piece_7:
        with BuildLine():
            CenterArc((3.076086715, -6.34900751), FILLET3_R, 88.986976441, 52.694799034)
            Line((-1.905991159, -2.41182577), (0, 0))
            ThreePointArc((0, 0), (1.594176327, 0.014093361), (3.188352654, 0))
        make_face()
    extrude(amount=3.175)
    with BuildSketch(Plane(origin=(-69.746013506, 57.15, -1.5875), x_dir=(-0.6200286205127318, -0.7845791927811233, 0), z_dir=(0, 0, 1))) as fillet3_piece_8:
        with BuildLine():
            CenterArc((3.076086715, 6.34900751), FILLET3_R, 218.318224525, 52.694799034)
            Line((-1.905991159, 2.41182577), (0, 0))
            ThreePointArc((0, 0), (1.594176327, -0.014093361), (3.188352654, 0))
        make_face()
    extrude(amount=3.175)
    with BuildSketch(Plane(origin=(-60.704804382, 66.675, -1.5875), x_dir=(0.8104674174729727, 0.5857837188030154, 0), z_dir=(0, 0, 1))) as fillet3_piece_9:
        with BuildLine():
            CenterArc((19.570038198, -6.309704304), FILLET3_R, 83.541821772, 150.599802763)
            Line((15.850311583, -11.456172405), (0, 0))
            ThreePointArc((0, 0), (10.142136584, 0.57219888), (20.284273168, 0))
        make_face()
    extrude(amount=3.175)
    with BuildSketch(Plane(origin=(60.704804382, 66.675, -1.5875), x_dir=(-0.8104674174729726, 0.5857837188030154, 0), z_dir=(0, 0, 1))) as fillet3_piece_10:
        with BuildLine():
            CenterArc((19.570038198, 6.309704304), FILLET3_R, 125.858375465, 150.599802763)
            Line((15.850311583, 11.456172405), (0, 0))
            ThreePointArc((0, 0), (10.142136584, -0.57219888), (20.284273168, 0))
        make_face()
    extrude(amount=3.175)

    # Fillet4
    fillet4_edges = [part.edges().sort_by_distance(p)[0] for p in [
        (-89.408, 1.27, 0),
        (-75.692, 1.27, 0),
        (-75.692, 4.445, 0),
        (-89.408, 4.445, 0),
        (-51.308, 1.27, 0),
        (-37.592, 1.27, 0),
        (-37.592, 4.445, 0),
        (-51.308, 4.445, 0),
        (89.408, 4.445, 0),
        (75.692, 4.445, 0),
        (75.692, 1.27, 0),
        (89.408, 1.27, 0),
        (51.308, 4.445, 0),
        (37.592, 4.445, 0),
        (37.592, 1.27, 0),
        (51.308, 1.27, 0),
        (73.533, 7.62, 0),
        (73.533, 10.795, 0),
        (53.467, 10.795, 0),
        (53.467, 7.62, 0),
        (-53.467, 7.62, 0),
        (-53.467, 10.795, 0),
        (-73.533, 10.795, 0),
        (-73.533, 7.62, 0),
        (-51.308, 60.325, 0),
        (-31.242, 60.325, 0),
        (-31.242, 63.5, 0),
        (-51.308, 63.5, 0),
        (31.242, 60.325, 0),
        (51.308, 60.325, 0),
        (51.308, 63.5, 0),
        (31.242, 63.5, 0),
    ]]
    fillet(fillet4_edges, radius=FILLET4_R)


solid = part.part
